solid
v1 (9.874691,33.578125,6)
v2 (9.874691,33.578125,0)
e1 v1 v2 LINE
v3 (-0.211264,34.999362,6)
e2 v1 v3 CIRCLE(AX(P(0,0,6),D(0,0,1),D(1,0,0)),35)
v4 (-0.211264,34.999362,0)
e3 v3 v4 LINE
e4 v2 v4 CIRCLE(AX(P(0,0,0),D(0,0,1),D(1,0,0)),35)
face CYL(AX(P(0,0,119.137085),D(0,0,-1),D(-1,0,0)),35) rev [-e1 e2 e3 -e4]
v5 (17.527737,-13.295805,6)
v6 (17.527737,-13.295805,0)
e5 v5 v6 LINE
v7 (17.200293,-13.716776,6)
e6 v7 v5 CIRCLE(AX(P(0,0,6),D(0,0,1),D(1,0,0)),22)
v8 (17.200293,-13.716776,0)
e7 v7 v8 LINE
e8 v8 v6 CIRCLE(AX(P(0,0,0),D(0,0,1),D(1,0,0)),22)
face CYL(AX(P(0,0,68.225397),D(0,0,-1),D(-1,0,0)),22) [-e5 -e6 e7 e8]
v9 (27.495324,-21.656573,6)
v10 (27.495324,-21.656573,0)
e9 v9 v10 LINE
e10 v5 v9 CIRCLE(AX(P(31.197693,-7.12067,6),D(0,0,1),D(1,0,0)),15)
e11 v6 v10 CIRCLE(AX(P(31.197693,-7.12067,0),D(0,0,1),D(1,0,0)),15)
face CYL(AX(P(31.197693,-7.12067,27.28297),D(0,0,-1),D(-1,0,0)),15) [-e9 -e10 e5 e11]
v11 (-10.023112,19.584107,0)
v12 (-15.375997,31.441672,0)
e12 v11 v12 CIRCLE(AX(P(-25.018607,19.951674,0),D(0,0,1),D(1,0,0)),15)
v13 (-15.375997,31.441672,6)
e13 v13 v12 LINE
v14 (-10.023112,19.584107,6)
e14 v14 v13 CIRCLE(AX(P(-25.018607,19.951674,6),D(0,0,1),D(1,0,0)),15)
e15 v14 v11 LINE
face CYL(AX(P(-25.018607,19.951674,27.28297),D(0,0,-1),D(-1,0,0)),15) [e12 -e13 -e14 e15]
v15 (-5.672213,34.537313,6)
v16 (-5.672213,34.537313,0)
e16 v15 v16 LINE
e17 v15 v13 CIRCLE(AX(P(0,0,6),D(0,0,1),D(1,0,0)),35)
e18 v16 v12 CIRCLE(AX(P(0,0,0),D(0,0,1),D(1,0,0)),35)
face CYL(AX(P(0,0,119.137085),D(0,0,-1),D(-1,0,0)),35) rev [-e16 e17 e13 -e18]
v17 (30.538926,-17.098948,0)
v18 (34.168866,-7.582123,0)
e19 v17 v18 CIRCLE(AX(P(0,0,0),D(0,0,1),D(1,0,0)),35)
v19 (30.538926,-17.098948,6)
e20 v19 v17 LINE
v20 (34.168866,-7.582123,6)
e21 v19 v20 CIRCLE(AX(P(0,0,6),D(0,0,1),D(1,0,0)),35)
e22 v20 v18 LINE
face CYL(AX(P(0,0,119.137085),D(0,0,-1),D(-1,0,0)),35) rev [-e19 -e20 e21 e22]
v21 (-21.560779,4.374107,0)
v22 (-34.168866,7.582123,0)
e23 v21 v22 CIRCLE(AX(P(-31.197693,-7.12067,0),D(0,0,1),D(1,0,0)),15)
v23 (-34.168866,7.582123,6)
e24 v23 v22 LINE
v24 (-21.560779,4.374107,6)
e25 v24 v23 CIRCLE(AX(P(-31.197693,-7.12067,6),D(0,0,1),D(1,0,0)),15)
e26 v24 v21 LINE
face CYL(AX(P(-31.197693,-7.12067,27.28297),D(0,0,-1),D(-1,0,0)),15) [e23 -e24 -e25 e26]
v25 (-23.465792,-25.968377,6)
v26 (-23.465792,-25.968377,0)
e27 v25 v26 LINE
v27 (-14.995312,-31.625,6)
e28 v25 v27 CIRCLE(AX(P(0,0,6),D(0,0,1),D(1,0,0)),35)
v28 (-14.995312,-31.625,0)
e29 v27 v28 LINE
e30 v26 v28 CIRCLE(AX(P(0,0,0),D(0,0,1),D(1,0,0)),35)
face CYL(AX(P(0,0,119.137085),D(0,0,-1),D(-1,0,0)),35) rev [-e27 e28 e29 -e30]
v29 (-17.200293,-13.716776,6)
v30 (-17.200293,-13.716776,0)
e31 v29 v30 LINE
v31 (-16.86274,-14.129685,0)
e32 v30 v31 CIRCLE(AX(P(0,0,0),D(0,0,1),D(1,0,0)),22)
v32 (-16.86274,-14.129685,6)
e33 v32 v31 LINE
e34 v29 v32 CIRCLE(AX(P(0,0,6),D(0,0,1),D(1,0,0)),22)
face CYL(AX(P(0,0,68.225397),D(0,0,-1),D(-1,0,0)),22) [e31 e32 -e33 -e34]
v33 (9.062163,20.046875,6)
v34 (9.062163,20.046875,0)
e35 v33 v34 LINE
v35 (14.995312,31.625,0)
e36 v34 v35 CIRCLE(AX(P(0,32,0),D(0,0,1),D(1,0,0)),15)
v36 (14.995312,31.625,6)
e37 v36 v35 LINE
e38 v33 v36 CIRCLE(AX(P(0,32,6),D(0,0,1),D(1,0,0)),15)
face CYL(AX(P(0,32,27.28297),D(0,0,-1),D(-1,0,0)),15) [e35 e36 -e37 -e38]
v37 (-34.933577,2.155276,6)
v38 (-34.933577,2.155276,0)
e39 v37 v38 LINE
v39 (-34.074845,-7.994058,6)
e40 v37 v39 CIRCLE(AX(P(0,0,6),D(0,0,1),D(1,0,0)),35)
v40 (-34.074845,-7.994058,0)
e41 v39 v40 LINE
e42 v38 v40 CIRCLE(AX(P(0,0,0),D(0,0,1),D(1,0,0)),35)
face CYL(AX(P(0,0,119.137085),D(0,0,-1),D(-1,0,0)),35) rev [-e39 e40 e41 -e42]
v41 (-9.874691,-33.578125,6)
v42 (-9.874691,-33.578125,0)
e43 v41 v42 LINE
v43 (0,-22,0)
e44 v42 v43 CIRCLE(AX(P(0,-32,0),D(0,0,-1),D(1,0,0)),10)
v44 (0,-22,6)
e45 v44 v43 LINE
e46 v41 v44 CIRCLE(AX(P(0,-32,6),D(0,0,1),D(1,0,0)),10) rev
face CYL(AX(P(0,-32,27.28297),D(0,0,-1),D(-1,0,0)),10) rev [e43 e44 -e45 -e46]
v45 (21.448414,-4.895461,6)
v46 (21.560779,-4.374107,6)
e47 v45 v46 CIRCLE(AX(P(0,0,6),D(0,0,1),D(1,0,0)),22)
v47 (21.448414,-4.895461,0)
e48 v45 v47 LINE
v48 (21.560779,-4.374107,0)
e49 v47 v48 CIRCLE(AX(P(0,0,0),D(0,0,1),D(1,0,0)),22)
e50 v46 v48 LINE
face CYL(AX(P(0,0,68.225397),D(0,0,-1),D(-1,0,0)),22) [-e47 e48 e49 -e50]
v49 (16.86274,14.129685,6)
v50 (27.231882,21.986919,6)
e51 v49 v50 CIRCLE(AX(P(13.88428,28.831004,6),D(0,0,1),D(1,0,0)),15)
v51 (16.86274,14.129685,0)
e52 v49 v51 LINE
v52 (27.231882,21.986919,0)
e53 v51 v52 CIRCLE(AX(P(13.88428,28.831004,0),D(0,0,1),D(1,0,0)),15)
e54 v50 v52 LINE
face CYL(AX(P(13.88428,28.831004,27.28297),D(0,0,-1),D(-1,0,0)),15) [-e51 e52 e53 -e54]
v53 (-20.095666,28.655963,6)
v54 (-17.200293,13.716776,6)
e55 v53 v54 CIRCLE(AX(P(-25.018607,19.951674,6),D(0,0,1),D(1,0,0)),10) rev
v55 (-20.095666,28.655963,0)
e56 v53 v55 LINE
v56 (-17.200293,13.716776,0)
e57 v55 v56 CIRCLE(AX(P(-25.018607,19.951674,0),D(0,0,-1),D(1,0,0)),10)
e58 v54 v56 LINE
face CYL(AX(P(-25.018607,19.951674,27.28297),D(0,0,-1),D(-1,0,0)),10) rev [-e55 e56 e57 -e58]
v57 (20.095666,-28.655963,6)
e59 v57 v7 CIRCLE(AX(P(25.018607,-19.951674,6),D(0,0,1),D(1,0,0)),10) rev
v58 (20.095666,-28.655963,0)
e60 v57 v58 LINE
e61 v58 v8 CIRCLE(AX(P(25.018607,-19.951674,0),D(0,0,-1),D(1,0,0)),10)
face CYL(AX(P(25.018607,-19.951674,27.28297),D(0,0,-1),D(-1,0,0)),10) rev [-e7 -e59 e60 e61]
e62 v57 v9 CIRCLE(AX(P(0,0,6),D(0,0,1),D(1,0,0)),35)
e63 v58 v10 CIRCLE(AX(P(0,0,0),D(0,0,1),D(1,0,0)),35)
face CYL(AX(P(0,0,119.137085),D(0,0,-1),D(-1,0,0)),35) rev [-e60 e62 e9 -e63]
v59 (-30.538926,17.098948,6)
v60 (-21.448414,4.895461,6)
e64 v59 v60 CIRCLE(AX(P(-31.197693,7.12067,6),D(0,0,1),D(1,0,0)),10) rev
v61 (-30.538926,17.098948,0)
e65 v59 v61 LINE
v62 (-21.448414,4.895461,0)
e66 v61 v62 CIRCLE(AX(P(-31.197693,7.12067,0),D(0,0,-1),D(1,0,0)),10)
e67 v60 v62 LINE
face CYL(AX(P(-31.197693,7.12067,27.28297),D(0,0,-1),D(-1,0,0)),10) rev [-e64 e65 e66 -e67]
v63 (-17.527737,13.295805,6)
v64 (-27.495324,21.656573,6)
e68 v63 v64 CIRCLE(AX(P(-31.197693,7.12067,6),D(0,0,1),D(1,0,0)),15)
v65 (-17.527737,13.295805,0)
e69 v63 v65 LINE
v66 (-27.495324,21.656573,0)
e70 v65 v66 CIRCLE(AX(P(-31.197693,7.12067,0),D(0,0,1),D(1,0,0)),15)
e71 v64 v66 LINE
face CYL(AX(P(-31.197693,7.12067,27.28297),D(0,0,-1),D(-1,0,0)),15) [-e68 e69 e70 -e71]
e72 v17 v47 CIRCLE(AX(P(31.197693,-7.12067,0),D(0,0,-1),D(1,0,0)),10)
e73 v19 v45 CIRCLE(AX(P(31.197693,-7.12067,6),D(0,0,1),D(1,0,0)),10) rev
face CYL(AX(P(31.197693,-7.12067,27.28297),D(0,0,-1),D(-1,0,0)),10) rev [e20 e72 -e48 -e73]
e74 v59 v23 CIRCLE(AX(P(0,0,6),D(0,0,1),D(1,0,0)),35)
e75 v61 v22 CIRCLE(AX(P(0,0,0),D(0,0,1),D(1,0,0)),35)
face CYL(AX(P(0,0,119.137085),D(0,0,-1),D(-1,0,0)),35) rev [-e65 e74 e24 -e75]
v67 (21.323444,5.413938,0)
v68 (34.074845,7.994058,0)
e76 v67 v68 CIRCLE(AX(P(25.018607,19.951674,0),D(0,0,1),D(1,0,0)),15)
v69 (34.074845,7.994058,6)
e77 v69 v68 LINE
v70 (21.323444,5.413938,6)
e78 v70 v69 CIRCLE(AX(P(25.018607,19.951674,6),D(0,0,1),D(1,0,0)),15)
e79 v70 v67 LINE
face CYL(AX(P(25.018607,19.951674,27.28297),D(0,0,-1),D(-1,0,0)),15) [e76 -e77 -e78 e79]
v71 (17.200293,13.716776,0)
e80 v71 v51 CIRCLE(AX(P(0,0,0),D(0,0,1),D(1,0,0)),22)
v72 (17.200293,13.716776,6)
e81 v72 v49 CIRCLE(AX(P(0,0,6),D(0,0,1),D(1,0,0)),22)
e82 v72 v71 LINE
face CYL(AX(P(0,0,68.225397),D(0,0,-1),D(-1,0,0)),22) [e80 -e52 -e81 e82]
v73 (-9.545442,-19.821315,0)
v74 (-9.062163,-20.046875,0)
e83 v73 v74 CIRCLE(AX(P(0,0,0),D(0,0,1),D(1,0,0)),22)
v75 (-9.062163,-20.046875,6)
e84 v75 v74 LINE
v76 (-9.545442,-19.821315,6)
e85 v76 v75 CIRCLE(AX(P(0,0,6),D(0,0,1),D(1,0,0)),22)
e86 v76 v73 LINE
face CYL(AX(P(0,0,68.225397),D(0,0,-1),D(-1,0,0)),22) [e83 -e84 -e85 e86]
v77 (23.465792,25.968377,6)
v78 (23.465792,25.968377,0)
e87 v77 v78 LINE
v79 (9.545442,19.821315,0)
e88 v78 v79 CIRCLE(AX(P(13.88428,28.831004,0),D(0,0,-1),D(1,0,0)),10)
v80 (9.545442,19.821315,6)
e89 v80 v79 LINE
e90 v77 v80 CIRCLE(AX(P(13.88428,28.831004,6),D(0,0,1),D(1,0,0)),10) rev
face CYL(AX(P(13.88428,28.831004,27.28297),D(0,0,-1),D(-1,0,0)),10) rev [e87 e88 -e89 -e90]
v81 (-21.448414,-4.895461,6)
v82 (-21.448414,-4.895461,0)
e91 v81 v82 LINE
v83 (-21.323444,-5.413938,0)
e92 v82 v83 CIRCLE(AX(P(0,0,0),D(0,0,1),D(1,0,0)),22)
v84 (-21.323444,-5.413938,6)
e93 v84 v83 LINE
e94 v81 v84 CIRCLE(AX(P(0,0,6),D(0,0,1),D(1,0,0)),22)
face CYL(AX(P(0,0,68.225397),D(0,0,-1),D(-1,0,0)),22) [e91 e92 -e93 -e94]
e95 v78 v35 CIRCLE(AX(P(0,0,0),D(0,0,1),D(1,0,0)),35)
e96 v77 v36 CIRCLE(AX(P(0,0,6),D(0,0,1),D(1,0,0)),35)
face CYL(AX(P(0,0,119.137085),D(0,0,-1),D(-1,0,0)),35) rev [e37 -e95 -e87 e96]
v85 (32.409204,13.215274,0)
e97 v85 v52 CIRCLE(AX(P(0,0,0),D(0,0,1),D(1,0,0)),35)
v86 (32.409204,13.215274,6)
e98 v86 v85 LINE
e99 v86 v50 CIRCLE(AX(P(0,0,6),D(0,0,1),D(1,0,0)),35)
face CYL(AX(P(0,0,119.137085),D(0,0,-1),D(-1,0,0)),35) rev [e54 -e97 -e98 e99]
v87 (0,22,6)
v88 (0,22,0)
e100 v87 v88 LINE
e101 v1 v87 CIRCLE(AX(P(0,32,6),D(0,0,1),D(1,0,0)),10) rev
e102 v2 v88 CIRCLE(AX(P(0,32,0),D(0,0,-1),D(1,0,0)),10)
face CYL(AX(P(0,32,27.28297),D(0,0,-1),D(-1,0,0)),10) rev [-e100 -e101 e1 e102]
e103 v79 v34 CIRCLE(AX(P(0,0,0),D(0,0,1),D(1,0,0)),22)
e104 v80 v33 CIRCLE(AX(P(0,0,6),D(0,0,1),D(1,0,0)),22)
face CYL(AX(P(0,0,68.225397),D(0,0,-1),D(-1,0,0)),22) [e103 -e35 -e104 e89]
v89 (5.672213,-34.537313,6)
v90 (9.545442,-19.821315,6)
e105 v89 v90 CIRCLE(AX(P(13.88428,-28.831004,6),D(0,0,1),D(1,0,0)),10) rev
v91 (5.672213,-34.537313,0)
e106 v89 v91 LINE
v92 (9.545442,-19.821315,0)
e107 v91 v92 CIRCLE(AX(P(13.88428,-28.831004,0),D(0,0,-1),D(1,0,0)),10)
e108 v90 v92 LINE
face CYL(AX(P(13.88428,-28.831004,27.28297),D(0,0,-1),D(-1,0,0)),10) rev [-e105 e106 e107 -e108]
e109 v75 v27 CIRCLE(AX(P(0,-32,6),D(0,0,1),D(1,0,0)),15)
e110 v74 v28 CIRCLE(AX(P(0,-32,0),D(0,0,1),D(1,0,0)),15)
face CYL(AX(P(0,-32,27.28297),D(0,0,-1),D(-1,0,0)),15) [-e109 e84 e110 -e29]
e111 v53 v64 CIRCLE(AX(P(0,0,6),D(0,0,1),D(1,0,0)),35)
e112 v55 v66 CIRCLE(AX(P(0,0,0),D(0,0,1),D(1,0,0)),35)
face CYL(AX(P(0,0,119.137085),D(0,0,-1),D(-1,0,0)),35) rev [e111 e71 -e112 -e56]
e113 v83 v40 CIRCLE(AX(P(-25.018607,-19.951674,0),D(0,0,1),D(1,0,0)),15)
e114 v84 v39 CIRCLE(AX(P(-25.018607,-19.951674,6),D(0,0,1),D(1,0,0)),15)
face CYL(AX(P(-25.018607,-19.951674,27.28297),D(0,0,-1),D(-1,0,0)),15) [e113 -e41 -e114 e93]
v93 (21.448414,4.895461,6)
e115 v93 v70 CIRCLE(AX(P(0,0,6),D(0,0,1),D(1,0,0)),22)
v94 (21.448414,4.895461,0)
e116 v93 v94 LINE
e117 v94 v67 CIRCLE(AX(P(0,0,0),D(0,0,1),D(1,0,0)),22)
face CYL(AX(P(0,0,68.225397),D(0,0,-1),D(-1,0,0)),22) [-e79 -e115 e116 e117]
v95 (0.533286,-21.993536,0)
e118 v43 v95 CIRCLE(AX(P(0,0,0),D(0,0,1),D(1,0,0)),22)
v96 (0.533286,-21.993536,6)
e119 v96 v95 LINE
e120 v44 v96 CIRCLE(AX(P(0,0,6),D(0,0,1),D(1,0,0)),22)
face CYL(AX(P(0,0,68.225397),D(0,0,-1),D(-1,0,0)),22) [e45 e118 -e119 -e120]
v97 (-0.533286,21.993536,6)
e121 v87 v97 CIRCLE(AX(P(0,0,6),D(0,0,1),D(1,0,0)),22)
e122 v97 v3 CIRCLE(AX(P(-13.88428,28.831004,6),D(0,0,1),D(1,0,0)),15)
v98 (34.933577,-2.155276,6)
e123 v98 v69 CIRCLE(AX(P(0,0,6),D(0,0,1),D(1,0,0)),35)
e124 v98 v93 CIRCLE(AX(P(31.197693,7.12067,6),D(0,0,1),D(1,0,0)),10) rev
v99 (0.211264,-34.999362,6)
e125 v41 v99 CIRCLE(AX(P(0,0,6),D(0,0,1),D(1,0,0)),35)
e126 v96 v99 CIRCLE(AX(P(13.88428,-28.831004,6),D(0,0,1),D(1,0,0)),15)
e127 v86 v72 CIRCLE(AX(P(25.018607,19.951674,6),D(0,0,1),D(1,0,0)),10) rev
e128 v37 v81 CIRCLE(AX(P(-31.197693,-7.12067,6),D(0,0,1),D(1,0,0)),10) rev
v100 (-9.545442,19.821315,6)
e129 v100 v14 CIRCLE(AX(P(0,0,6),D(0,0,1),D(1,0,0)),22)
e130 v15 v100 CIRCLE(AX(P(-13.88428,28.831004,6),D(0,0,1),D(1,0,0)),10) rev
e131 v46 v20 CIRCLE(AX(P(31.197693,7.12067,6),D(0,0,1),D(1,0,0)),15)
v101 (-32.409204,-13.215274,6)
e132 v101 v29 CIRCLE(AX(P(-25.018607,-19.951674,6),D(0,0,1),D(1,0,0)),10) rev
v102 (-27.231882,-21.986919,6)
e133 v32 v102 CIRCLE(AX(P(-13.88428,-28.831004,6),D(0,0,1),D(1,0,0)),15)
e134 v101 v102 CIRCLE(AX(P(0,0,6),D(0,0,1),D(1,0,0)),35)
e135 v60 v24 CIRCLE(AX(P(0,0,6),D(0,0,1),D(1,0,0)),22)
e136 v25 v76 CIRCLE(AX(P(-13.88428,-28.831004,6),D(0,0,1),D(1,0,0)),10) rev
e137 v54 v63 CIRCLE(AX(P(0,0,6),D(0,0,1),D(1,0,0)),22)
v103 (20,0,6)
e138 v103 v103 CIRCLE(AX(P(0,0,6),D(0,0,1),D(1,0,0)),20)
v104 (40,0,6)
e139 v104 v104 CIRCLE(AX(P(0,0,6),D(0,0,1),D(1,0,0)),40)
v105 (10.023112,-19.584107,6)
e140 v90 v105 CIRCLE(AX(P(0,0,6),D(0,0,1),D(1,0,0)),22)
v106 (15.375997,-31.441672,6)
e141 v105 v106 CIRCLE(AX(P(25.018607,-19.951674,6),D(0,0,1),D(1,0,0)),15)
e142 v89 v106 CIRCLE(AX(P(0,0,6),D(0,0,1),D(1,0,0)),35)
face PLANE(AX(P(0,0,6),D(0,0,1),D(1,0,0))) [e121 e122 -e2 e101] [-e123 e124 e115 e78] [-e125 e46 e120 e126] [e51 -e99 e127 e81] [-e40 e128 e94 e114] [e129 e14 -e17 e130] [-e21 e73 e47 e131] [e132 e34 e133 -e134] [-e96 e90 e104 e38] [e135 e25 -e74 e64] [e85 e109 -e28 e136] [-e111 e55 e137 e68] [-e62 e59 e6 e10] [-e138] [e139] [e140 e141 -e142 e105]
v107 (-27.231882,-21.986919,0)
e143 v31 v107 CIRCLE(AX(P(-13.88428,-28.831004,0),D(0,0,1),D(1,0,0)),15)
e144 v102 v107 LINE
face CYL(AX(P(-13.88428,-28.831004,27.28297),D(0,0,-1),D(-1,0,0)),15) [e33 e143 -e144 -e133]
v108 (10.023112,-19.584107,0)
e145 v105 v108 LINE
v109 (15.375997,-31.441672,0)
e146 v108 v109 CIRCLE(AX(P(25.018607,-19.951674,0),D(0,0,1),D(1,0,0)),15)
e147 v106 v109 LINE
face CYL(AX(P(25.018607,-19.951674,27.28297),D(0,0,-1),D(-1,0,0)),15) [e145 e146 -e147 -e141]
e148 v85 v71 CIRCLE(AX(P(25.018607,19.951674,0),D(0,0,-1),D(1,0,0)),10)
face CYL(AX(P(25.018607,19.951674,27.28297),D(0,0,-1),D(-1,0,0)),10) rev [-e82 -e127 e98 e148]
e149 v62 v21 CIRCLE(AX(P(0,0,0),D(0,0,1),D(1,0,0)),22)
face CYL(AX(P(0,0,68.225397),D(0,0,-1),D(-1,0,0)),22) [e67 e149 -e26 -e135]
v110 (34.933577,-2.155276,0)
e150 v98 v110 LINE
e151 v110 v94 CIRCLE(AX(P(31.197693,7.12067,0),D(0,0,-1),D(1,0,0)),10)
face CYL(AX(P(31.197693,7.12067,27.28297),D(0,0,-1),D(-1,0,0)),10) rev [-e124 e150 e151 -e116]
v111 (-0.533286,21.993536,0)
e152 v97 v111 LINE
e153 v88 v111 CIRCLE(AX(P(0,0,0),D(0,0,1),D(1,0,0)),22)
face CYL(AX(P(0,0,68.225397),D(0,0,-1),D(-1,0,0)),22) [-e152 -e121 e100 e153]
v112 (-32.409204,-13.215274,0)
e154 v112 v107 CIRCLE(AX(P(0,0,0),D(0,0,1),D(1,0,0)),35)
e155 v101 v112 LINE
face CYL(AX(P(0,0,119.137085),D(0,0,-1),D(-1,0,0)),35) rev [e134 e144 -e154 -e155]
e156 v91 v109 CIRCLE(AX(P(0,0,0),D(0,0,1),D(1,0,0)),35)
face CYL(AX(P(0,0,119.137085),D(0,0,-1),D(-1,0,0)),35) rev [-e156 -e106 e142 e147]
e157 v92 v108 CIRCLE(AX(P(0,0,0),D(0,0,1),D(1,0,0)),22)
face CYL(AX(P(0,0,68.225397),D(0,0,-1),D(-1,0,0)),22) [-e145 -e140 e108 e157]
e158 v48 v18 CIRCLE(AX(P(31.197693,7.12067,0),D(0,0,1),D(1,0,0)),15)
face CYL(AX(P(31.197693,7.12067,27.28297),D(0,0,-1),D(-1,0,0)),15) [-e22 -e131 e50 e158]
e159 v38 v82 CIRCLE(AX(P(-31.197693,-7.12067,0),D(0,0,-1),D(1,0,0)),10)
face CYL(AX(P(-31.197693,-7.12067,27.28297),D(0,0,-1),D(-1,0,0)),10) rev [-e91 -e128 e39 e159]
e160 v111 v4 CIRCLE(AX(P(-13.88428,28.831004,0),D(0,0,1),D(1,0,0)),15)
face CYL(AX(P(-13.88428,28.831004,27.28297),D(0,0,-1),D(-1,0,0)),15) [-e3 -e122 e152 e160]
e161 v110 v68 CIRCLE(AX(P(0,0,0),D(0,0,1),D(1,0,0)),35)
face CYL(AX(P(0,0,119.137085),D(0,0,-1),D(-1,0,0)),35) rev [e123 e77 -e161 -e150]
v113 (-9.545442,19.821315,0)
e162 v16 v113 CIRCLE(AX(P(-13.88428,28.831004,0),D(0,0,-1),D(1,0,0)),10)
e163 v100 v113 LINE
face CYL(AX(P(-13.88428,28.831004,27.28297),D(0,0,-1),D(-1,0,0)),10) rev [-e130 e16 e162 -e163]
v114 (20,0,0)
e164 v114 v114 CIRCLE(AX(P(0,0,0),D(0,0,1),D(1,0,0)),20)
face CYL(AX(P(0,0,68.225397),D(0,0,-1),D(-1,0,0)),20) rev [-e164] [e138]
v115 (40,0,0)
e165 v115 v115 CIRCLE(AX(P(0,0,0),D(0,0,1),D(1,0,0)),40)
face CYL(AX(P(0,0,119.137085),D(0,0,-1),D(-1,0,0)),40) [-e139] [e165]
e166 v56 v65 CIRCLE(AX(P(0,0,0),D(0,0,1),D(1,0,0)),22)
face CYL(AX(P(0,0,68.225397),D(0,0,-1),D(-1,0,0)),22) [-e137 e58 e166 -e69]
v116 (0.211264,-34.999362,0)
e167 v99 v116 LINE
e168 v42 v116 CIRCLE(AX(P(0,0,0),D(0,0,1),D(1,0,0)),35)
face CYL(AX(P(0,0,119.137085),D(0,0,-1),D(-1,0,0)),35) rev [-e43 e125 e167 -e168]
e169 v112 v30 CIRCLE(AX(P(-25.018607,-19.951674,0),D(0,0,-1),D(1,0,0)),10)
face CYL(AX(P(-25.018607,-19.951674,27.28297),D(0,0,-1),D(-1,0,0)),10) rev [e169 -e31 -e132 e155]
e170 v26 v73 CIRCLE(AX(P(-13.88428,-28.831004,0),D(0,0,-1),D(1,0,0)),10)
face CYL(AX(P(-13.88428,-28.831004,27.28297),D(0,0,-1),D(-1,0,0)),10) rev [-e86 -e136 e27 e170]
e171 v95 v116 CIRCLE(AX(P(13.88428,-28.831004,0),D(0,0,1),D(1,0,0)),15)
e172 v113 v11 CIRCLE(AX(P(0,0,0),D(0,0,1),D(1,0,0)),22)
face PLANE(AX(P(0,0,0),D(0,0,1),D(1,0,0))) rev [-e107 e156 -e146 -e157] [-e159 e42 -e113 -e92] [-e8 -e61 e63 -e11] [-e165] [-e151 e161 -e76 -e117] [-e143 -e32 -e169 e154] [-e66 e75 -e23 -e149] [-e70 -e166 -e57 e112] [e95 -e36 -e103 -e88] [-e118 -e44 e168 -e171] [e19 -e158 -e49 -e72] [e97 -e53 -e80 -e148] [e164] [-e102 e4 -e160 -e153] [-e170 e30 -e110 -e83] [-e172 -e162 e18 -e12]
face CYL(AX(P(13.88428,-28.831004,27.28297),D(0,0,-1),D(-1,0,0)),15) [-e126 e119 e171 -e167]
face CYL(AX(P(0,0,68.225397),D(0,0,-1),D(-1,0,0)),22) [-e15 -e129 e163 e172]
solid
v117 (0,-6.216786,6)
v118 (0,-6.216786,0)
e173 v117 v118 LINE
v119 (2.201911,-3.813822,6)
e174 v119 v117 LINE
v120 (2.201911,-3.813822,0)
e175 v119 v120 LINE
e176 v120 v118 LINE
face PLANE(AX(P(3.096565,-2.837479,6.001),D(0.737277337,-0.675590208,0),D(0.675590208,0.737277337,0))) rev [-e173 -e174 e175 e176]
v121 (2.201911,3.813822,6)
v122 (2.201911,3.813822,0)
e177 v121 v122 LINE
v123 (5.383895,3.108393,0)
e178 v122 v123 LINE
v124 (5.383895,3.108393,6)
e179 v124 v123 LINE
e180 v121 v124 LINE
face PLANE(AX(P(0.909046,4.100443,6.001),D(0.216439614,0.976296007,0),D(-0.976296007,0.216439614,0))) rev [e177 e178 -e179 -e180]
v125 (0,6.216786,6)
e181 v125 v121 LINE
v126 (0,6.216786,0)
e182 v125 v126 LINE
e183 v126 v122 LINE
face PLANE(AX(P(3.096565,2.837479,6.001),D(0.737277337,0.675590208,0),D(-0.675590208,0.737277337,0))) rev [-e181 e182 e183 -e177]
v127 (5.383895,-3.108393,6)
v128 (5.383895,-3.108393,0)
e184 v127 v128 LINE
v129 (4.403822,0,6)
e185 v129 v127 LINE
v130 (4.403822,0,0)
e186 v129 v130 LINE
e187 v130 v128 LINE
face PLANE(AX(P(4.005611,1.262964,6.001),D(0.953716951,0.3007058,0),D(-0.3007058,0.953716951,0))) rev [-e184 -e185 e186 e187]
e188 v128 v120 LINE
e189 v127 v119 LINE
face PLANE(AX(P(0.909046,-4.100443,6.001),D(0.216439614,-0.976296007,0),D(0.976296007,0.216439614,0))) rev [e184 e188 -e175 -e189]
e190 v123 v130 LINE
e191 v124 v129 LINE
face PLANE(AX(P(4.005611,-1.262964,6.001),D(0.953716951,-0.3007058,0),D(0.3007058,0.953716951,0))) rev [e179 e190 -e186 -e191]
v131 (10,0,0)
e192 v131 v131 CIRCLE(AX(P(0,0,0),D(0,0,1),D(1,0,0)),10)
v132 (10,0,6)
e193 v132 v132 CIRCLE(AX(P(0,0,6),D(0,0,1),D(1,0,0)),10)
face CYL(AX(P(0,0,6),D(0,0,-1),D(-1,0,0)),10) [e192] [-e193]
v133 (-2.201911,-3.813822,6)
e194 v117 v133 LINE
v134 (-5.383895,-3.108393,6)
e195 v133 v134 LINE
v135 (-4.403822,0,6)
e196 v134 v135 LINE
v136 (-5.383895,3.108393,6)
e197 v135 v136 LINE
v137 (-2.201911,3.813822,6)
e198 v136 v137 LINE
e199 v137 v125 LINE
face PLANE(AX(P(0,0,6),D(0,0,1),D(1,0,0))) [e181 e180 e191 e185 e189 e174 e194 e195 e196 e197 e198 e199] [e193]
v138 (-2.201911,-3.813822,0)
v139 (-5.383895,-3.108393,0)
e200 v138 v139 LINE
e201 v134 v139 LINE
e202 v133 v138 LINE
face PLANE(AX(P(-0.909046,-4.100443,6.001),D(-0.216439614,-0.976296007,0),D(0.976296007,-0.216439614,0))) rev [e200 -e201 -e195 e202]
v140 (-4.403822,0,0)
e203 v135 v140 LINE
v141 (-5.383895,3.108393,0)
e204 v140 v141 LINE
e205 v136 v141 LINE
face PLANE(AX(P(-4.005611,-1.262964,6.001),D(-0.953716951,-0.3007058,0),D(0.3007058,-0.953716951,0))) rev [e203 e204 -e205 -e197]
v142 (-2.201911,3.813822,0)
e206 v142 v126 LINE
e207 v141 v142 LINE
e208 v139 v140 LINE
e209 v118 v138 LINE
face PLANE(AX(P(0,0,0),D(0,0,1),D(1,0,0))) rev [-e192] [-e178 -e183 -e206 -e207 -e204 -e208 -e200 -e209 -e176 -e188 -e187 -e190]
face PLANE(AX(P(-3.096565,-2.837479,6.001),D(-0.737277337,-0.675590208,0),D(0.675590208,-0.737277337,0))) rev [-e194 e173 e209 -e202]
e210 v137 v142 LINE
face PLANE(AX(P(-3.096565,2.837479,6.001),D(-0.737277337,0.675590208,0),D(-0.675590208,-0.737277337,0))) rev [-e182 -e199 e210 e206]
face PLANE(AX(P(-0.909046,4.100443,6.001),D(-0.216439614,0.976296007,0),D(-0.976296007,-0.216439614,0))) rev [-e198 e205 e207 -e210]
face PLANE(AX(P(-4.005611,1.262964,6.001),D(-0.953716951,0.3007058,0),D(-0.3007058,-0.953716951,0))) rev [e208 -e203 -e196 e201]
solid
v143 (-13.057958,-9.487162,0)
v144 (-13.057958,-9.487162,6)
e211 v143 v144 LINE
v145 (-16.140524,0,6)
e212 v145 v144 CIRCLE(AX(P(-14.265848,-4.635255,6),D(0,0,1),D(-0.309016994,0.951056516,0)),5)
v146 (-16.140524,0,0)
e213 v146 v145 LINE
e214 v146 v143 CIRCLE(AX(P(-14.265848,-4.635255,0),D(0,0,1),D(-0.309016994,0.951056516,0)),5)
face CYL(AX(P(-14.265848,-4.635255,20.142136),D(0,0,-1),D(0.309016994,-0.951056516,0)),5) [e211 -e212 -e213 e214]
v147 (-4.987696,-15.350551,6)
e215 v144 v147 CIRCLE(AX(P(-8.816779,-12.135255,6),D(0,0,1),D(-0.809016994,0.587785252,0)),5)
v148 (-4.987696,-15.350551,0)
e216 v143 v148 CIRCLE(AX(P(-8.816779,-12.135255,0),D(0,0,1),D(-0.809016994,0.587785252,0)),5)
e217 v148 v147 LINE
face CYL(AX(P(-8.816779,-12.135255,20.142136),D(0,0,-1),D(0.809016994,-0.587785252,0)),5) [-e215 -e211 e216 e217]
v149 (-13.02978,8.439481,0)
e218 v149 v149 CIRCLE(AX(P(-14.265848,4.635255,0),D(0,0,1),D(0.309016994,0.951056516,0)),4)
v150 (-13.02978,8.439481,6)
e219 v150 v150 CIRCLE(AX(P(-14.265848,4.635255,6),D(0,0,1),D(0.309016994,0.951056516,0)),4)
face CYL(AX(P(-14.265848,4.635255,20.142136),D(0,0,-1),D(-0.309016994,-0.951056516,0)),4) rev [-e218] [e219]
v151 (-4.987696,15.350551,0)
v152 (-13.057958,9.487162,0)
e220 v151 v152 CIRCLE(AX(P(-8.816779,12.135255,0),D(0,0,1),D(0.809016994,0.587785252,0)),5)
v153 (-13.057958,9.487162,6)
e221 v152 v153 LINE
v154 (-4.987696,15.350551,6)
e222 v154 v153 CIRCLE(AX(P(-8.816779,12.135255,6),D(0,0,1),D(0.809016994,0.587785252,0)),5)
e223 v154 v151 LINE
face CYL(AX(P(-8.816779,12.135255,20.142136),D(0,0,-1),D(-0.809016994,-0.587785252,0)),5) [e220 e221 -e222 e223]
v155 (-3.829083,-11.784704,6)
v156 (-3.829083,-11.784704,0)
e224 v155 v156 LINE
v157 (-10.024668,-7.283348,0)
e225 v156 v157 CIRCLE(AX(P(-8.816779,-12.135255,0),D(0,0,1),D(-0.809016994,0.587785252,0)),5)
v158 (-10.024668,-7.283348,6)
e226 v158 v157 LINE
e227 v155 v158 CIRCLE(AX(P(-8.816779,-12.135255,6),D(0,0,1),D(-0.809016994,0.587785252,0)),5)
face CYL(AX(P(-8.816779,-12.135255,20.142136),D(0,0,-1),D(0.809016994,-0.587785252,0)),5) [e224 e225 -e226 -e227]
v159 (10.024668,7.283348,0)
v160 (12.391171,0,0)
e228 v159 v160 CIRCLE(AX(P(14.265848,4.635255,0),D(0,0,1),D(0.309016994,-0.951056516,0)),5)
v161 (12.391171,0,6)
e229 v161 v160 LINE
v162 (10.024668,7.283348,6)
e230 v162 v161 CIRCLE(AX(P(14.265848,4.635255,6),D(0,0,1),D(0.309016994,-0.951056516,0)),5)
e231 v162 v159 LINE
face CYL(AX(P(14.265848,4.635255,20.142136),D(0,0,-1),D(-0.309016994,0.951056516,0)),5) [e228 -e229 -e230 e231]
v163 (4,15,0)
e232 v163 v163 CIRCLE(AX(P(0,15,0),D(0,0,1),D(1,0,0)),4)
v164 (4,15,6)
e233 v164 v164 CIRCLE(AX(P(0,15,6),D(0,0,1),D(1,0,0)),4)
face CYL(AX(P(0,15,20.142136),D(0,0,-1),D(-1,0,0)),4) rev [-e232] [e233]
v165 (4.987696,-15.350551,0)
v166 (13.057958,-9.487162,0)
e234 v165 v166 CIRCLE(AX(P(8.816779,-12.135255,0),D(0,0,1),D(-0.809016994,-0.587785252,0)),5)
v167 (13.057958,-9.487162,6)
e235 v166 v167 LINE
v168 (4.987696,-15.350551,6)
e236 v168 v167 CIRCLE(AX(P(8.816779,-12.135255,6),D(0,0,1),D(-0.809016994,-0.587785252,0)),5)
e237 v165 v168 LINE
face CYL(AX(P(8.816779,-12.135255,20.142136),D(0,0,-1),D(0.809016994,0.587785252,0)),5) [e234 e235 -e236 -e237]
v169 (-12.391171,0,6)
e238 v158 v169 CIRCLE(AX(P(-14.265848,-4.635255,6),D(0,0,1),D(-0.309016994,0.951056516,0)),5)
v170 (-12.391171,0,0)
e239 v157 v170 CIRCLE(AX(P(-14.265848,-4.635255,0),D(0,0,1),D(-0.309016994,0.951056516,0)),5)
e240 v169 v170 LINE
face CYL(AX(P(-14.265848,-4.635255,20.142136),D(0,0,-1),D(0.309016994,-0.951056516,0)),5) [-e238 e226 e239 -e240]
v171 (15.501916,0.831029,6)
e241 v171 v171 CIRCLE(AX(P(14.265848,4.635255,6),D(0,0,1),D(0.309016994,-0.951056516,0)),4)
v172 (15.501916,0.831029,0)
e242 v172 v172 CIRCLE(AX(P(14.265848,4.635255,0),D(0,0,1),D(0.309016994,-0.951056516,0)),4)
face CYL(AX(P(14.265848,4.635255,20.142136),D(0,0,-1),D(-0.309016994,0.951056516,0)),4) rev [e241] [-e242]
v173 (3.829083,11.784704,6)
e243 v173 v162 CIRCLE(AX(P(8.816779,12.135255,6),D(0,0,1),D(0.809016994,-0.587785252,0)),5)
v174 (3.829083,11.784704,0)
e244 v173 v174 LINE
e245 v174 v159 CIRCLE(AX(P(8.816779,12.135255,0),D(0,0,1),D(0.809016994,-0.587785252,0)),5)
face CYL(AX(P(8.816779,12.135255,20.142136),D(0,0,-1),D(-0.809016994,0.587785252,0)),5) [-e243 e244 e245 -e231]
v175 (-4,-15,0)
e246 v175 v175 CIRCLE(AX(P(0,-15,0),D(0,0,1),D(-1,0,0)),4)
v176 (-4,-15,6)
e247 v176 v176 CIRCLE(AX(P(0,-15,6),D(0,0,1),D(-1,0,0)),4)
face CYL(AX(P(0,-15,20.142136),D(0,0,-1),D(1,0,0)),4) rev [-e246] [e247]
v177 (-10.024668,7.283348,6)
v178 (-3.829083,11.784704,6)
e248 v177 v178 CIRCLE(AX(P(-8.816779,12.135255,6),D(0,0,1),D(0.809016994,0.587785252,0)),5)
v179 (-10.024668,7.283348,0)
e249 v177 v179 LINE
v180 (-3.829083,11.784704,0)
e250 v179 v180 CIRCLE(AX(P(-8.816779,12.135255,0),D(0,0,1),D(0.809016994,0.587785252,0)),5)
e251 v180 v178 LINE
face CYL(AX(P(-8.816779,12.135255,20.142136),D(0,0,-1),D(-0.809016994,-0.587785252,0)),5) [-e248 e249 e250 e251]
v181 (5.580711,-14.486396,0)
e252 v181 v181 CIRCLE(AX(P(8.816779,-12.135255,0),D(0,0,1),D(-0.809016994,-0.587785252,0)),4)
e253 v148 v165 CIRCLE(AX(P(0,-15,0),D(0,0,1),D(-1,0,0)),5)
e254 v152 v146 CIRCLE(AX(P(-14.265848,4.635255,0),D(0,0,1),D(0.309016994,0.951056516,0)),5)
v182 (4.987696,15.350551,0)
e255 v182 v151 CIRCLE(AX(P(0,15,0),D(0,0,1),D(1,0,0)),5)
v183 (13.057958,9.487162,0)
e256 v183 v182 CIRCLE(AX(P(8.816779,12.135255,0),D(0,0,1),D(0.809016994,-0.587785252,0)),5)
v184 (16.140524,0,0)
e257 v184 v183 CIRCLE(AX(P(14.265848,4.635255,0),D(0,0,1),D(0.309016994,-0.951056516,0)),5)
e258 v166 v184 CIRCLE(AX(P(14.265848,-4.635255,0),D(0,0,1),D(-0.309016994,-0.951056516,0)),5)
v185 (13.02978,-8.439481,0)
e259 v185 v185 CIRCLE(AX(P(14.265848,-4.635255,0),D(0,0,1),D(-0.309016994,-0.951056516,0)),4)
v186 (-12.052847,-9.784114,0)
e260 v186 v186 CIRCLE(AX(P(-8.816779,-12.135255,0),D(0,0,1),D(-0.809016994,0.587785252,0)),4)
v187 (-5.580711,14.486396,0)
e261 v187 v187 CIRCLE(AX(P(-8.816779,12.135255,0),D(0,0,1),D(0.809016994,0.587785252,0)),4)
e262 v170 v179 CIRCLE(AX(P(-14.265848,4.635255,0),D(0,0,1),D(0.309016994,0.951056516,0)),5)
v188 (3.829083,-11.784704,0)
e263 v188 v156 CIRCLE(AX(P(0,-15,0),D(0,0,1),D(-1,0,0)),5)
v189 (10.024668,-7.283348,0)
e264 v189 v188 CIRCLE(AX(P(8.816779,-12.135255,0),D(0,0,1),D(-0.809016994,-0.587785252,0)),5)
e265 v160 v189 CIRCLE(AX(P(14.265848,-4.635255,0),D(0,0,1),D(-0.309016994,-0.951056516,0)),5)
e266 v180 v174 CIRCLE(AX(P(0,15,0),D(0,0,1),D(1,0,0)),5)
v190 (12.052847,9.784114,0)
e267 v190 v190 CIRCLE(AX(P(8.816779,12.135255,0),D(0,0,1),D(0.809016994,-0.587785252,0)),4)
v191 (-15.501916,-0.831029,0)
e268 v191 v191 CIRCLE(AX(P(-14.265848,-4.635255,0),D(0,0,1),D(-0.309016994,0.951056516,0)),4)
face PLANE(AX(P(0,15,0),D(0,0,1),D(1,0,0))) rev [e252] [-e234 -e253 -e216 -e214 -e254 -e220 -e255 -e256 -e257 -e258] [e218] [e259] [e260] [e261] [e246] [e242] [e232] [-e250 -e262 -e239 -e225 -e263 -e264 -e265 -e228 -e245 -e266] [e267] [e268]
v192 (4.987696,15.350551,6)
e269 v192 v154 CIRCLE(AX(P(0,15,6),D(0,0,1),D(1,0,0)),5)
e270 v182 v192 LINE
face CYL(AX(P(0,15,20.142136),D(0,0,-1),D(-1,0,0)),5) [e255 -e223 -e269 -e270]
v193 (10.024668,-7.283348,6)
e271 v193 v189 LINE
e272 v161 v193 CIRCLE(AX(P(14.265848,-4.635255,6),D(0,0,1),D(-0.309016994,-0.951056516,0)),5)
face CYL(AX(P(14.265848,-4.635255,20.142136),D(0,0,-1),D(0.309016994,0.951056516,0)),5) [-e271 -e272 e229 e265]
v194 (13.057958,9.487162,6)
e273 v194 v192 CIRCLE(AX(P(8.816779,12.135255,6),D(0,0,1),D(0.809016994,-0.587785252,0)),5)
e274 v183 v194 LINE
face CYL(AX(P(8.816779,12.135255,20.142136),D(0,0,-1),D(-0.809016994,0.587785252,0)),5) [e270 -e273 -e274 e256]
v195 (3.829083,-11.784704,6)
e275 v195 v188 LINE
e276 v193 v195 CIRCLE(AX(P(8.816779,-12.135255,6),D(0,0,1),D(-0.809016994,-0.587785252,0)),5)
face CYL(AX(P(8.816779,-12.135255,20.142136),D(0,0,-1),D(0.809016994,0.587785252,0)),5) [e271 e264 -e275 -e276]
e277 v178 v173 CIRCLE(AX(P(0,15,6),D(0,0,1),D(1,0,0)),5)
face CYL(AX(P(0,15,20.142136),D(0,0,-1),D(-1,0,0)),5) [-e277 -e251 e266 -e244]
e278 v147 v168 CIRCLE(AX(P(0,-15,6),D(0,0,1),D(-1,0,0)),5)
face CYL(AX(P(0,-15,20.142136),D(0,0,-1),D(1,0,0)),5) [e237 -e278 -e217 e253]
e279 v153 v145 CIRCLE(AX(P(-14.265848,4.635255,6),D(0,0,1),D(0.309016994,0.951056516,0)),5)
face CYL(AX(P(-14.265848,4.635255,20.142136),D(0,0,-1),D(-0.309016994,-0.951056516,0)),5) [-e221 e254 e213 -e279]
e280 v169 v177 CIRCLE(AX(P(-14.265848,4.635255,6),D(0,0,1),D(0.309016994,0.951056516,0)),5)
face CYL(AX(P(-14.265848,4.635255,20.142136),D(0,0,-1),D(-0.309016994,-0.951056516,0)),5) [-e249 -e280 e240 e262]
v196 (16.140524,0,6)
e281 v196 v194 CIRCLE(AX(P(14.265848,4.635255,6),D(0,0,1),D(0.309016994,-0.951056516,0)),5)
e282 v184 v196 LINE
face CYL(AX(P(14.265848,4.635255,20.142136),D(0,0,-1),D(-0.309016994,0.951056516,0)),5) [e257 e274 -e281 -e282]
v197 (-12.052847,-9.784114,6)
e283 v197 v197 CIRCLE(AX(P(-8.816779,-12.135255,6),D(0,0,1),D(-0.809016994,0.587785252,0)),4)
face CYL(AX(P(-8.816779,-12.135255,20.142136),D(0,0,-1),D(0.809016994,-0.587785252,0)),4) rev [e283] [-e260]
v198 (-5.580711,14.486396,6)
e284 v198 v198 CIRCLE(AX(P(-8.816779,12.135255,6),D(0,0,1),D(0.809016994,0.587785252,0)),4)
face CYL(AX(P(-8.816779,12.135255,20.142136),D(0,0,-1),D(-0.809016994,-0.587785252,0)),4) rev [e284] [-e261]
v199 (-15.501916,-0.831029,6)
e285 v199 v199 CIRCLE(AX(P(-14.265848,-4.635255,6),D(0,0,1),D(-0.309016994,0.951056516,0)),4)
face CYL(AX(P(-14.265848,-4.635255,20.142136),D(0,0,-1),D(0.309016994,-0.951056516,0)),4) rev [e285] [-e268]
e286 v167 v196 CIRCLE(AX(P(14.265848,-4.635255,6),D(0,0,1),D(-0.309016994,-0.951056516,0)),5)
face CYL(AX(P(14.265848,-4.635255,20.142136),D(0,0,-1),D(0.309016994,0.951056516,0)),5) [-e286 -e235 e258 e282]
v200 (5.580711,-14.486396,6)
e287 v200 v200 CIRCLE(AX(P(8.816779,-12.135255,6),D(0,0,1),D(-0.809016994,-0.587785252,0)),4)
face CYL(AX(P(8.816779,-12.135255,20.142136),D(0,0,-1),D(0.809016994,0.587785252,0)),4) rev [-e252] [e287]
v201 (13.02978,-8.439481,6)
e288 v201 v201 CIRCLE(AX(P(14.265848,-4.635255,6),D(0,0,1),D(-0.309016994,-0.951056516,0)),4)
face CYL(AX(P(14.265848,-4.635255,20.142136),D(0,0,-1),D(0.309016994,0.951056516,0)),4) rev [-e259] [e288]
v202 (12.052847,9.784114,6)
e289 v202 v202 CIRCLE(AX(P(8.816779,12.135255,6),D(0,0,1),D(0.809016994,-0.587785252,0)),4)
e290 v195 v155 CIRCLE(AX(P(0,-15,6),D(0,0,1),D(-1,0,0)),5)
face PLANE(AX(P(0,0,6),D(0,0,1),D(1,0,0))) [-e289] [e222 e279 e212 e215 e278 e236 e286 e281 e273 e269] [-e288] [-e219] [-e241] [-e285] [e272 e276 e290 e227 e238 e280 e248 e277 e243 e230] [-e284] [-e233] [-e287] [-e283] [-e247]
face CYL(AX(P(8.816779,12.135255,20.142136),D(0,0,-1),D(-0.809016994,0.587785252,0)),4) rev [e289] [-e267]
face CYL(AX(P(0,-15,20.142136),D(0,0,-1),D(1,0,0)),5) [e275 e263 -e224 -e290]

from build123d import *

# Parameters (mm, degrees)
SKETCH2_R           = 10
SKETCH2_R_2         = 1
BOSS_EXTRUDE2_DEPTH = 6
SKETCH3_R           = 5
SKETCH3_R_2         = 4
BOSS_EXTRUDE3_DEPTH = 6
CIRPATTERN1_COUNT   = 10
SKETCH5_R           = 22
SKETCH5_R_2         = 20
BOSS_EXTRUDE4_DEPTH = 6
SKETCH6_R           = 40
SKETCH6_R_2         = 35
BOSS_EXTRUDE5_DEPTH = 6
BOSS_EXTRUDE6_DEPTH = 6
CAVITY1_OUTLINE_R   = 1
CAVITY1_DEPTH       = 6
CUT_EXTRUDE1_DEPTH  = 6


# Read off the part's stored shape, not the designer's step: Cavity1
with BuildPart() as part:
    # Sketch2 → Boss-Extrude2 (new body)
    with BuildSketch(Plane.XY):
        Circle(SKETCH2_R)
        Circle(SKETCH2_R_2, mode=Mode.SUBTRACT)
    extrude(amount=BOSS_EXTRUDE2_DEPTH)

    # Cavity1 outline → Cavity1 (cut)
    with BuildSketch(Plane.XY):
        Polygon((5.127518984, -2.960374466), (4.194116501, 0), (5.127518984, 2.960374466), (2.09705825, 3.632211436), (0, 5.920748932), (-2.09705825, 3.632211436), (-5.127518984, 2.960374466), (-4.194116501, 0), (-5.127518984, -2.960374466), (-2.09705825, -3.632211436), (0, -5.920748932), (2.09705825, -3.632211436), align=None)
        Circle(CAVITY1_OUTLINE_R, mode=Mode.SUBTRACT)
    extrude(amount=CAVITY1_DEPTH, mode=Mode.SUBTRACT)

    # Sketch8 → Cut-Extrude1 (cut)
    # profile 1 of 2: a face of its own
    with BuildSketch(Plane(origin=(0, 0, 0), x_dir=(-1, 0, 0), z_dir=(0, 0, -1))):
        Polygon((5.383894933, -3.108393189), (4.403822326, 0), (5.383894933, 3.108393189), (2.201911163, 3.813822008), (0, 6.216786378), (-2.201911163, 3.813822008), (-5.383894933, 3.108393189), (-4.403822326, 0), (-5.383894933, -3.108393189), (-2.201911163, -3.813822008), (0, -6.216786378), (2.201911163, -3.813822008), align=None)
        Polygon((-2.09705825, -3.632211436), (-5.127518984, -2.960374466), (-4.194116501, 0), (-5.127518984, 2.960374466), (-2.09705825, 3.632211436), (0, 5.920748932), (2.09705825, 3.632211436), (5.127518984, 2.960374466), (4.194116501, 0), (5.127518984, -2.960374466), (2.09705825, -3.632211436), (0, -5.920748932), align=None, mode=Mode.SUBTRACT)
    # profile 2 of 2: a face of its own
    with BuildSketch(Plane(origin=(0, 0, 0), x_dir=(-1, 0, 0), z_dir=(0, 0, -1))):
        Polygon((-5.127518984, -2.960374466), (-4.194116501, 0), (-5.127518984, 2.960374466), (-2.09705825, 3.632211436), (0, 5.920748932), (2.09705825, 3.632211436), (5.127518984, 2.960374466), (4.194116501, 0), (5.127518984, -2.960374466), (2.09705825, -3.632211436), (0, -5.920748932), (-2.09705825, -3.632211436), align=None)
    extrude(amount=-CUT_EXTRUDE1_DEPTH, mode=Mode.SUBTRACT)


with BuildPart() as body_2:
    # Sketch3 → Boss-Extrude3 (new body)
    with BuildSketch(Plane.XY):
        with Locations((0, 15)):
            Circle(SKETCH3_R)
        with Locations((0, 15)):
            Circle(SKETCH3_R_2, mode=Mode.SUBTRACT)
    boss_extrude3 = extrude(amount=BOSS_EXTRUDE3_DEPTH)

    # CirPattern1: Boss-Extrude3 ×10 about axis
    cirpattern1_axis = Axis((0, 0, 0), (0, 0, 1))
    for i in range(1, CIRPATTERN1_COUNT):
        add(boss_extrude3.rotate(cirpattern1_axis, i * 360 / CIRPATTERN1_COUNT))


with BuildPart() as body_3:
    # Sketch5 → Boss-Extrude4 (new body)
    with BuildSketch(Plane.XY):
        Circle(SKETCH5_R)
        Circle(SKETCH5_R_2, mode=Mode.SUBTRACT)
    extrude(amount=BOSS_EXTRUDE4_DEPTH)



with BuildPart() as body_4:
    # Sketch6 → Boss-Extrude5 (new body)
    with BuildSketch(Plane.XY):
        Circle(SKETCH6_R)
        Circle(SKETCH6_R_2, mode=Mode.SUBTRACT)
    extrude(amount=BOSS_EXTRUDE5_DEPTH)


with BuildPart() as body_3_1:
    add(body_3.part)

    add(body_4.part)  # Boss-Extrude6 merges body 4
    # Sketch7 → Boss-Extrude6 (add)
    with BuildSketch(Plane.XY):
        with BuildLine():
            ThreePointArc((0, 22), (7.608588897, 25.510826324), (9.874690956, 33.578125))
            ThreePointArc((9.874690956, 33.578125), (12.473288788, 32.70194286), (14.995311767, 31.625))
            ThreePointArc((14.995311767, 31.625), (13.349298508, 25.159223045), (9.062163248, 20.046875))
            ThreePointArc((9.062163248, 20.046875), (4.635124054, 21.506176438), (0, 22))
        make_face()
        with BuildLine():
            ThreePointArc((16.862740045, 14.129684999), (13.507282719, 17.365290483), (9.545442261, 19.821315094))
            ThreePointArc((9.545442261, 19.821315094), (17.923834438, 19.683217312), (23.465791559, 25.968377433))
            ThreePointArc((23.465791559, 25.968377433), (25.426886123, 24.051475258), (27.231882316, 21.986918509))
            ThreePointArc((27.231882316, 21.986918509), (22.943480132, 16.875633153), (16.862740045, 14.129684999))
        make_face()
        with BuildLine():
            ThreePointArc((21.323444368, 5.413937595), (19.704158385, 9.784995775), (17.200292614, 13.716775641))
            ThreePointArc((17.200292614, 13.716775641), (24.689044747, 9.957105713), (32.409204355, 13.215274234))
            ThreePointArc((32.409204355, 13.215274234), (33.344376821, 10.63731801), (34.074844596, 7.994058155))
            ThreePointArc((34.074844596, 7.994058155), (27.993424133, 5.249617149), (21.323444368, 5.413937595))
        make_face()
        with BuildLine():
            ThreePointArc((21.560779019, -4.374106547), (21.998383828, 0.26666265), (21.448414068, 4.895460547))
            ThreePointArc((21.448414068, 4.895460547), (26.564286953, -1.741132788), (34.933576755, -2.155276102))
            ThreePointArc((34.933576755, -2.155276102), (34.657604747, -4.883690529), (34.168866002, -7.582123457))
            ThreePointArc((34.168866002, -7.582123457), (27.498927167, -7.416149914), (21.560779019, -4.374106547))
        make_face()
        with BuildLine():
            ThreePointArc((17.52773696, -13.295805243), (19.935559561, -9.304486284), (21.448414068, -4.895460547))
            ThreePointArc((21.448414068, -4.895460547), (23.178146338, -13.094518587), (30.538925847, -17.098947573))
            ThreePointArc((30.538925847, -17.098947573), (29.106469006, -19.437424263), (27.495324443, -21.65657253))
            ThreePointArc((27.495324443, -21.65657253), (21.557930424, -18.613057533), (17.52773696, -13.295805243))
        make_face()
        with BuildLine():
            ThreePointArc((10.023111632, -19.584106648), (13.924253229, -17.032767597), (17.200292614, -13.716775641))
            ThreePointArc((17.200292614, -13.716775641), (15.20128958, -21.854374387), (20.095666139, -28.655962772))
            ThreePointArc((20.095666139, -28.655962772), (17.790440111, -30.141337738), (15.37599667, -31.441671813))
            ThreePointArc((15.37599667, -31.441671813), (11.34712117, -26.123420834), (10.023111632, -19.584106648))
        make_face()
        with BuildLine():
            ThreePointArc((0.53328612, -21.993535548), (5.155077775, -21.387500395), (9.545442261, -19.821315094))
            ThreePointArc((9.545442261, -19.821315094), (4.213630989, -26.285703312), (5.672213296, -34.537313102))
            ThreePointArc((5.672213296, -34.537313102), (2.950796366, -34.875389615), (0.211264183, -34.999362386))
            ThreePointArc((0.211264183, -34.999362386), (-1.111124596, -28.459720256), (0.53328612, -21.993535548))
        make_face()
        with BuildLine():
            ThreePointArc((-9.062163248, -20.046875), (-4.635124054, -21.506176438), (0, -22))
            ThreePointArc((0, -22), (-7.608588897, -25.510826324), (-9.874690956, -33.578125))
            ThreePointArc((-9.874690956, -33.578125), (-12.473288788, -32.70194286), (-14.995311767, -31.625))
            ThreePointArc((-14.995311767, -31.625), (-13.349298508, -25.159223045), (-9.062163248, -20.046875))
        make_face()
        with BuildLine():
            ThreePointArc((-16.862740045, -14.129684999), (-13.507282719, -17.365290483), (-9.545442261, -19.821315094))
            ThreePointArc((-9.545442261, -19.821315094), (-17.923834438, -19.683217312), (-23.465791559, -25.968377433))
            ThreePointArc((-23.465791559, -25.968377433), (-25.426886123, -24.051475258), (-27.231882316, -21.986918509))
            ThreePointArc((-27.231882316, -21.986918509), (-22.943480132, -16.875633153), (-16.862740045, -14.129684999))
        make_face()
        with BuildLine():
            ThreePointArc((-21.323444368, -5.413937595), (-19.704158385, -9.784995775), (-17.200292614, -13.716775641))
            ThreePointArc((-17.200292614, -13.716775641), (-24.689044747, -9.957105713), (-32.409204355, -13.215274234))
            ThreePointArc((-32.409204355, -13.215274234), (-33.344376821, -10.63731801), (-34.074844596, -7.994058155))
            ThreePointArc((-34.074844596, -7.994058155), (-27.993424133, -5.249617149), (-21.323444368, -5.413937595))
        make_face()
        with BuildLine():
            ThreePointArc((-21.560779019, 4.374106547), (-21.998383828, -0.26666265), (-21.448414068, -4.895460547))
            ThreePointArc((-21.448414068, -4.895460547), (-26.564286953, 1.741132788), (-34.933576755, 2.155276102))
            ThreePointArc((-34.933576755, 2.155276102), (-34.657604747, 4.883690529), (-34.168866002, 7.582123457))
            ThreePointArc((-34.168866002, 7.582123457), (-27.498927167, 7.416149914), (-21.560779019, 4.374106547))
        make_face()
        with BuildLine():
            ThreePointArc((-17.52773696, 13.295805243), (-19.935559561, 9.304486284), (-21.448414068, 4.895460547))
            ThreePointArc((-21.448414068, 4.895460547), (-23.178146338, 13.094518587), (-30.538925847, 17.098947573))
            ThreePointArc((-30.538925847, 17.098947573), (-29.106469006, 19.437424263), (-27.495324443, 21.65657253))
            ThreePointArc((-27.495324443, 21.65657253), (-21.557930424, 18.613057533), (-17.52773696, 13.295805243))
        make_face()
        with BuildLine():
            ThreePointArc((-10.023111632, 19.584106648), (-13.924253229, 17.032767597), (-17.200292614, 13.716775641))
            ThreePointArc((-17.200292614, 13.716775641), (-15.20128958, 21.854374387), (-20.095666139, 28.655962772))
            ThreePointArc((-20.095666139, 28.655962772), (-17.790440111, 30.141337738), (-15.37599667, 31.441671813))
            ThreePointArc((-15.37599667, 31.441671813), (-11.34712117, 26.123420834), (-10.023111632, 19.584106648))
        make_face()
        with BuildLine():
            ThreePointArc((-0.53328612, 21.993535548), (-5.155077775, 21.387500395), (-9.545442261, 19.821315094))
            ThreePointArc((-9.545442261, 19.821315094), (-4.213630989, 26.285703312), (-5.672213296, 34.537313102))
            ThreePointArc((-5.672213296, 34.537313102), (-2.950796366, 34.875389615), (-0.211264183, 34.999362386))
            ThreePointArc((-0.211264183, 34.999362386), (1.111124596, 28.459720256), (-0.53328612, 21.993535548))
        make_face()
    extrude(amount=BOSS_EXTRUDE6_DEPTH)


solid = Compound([part.part, body_2.part, body_3_1.part])
